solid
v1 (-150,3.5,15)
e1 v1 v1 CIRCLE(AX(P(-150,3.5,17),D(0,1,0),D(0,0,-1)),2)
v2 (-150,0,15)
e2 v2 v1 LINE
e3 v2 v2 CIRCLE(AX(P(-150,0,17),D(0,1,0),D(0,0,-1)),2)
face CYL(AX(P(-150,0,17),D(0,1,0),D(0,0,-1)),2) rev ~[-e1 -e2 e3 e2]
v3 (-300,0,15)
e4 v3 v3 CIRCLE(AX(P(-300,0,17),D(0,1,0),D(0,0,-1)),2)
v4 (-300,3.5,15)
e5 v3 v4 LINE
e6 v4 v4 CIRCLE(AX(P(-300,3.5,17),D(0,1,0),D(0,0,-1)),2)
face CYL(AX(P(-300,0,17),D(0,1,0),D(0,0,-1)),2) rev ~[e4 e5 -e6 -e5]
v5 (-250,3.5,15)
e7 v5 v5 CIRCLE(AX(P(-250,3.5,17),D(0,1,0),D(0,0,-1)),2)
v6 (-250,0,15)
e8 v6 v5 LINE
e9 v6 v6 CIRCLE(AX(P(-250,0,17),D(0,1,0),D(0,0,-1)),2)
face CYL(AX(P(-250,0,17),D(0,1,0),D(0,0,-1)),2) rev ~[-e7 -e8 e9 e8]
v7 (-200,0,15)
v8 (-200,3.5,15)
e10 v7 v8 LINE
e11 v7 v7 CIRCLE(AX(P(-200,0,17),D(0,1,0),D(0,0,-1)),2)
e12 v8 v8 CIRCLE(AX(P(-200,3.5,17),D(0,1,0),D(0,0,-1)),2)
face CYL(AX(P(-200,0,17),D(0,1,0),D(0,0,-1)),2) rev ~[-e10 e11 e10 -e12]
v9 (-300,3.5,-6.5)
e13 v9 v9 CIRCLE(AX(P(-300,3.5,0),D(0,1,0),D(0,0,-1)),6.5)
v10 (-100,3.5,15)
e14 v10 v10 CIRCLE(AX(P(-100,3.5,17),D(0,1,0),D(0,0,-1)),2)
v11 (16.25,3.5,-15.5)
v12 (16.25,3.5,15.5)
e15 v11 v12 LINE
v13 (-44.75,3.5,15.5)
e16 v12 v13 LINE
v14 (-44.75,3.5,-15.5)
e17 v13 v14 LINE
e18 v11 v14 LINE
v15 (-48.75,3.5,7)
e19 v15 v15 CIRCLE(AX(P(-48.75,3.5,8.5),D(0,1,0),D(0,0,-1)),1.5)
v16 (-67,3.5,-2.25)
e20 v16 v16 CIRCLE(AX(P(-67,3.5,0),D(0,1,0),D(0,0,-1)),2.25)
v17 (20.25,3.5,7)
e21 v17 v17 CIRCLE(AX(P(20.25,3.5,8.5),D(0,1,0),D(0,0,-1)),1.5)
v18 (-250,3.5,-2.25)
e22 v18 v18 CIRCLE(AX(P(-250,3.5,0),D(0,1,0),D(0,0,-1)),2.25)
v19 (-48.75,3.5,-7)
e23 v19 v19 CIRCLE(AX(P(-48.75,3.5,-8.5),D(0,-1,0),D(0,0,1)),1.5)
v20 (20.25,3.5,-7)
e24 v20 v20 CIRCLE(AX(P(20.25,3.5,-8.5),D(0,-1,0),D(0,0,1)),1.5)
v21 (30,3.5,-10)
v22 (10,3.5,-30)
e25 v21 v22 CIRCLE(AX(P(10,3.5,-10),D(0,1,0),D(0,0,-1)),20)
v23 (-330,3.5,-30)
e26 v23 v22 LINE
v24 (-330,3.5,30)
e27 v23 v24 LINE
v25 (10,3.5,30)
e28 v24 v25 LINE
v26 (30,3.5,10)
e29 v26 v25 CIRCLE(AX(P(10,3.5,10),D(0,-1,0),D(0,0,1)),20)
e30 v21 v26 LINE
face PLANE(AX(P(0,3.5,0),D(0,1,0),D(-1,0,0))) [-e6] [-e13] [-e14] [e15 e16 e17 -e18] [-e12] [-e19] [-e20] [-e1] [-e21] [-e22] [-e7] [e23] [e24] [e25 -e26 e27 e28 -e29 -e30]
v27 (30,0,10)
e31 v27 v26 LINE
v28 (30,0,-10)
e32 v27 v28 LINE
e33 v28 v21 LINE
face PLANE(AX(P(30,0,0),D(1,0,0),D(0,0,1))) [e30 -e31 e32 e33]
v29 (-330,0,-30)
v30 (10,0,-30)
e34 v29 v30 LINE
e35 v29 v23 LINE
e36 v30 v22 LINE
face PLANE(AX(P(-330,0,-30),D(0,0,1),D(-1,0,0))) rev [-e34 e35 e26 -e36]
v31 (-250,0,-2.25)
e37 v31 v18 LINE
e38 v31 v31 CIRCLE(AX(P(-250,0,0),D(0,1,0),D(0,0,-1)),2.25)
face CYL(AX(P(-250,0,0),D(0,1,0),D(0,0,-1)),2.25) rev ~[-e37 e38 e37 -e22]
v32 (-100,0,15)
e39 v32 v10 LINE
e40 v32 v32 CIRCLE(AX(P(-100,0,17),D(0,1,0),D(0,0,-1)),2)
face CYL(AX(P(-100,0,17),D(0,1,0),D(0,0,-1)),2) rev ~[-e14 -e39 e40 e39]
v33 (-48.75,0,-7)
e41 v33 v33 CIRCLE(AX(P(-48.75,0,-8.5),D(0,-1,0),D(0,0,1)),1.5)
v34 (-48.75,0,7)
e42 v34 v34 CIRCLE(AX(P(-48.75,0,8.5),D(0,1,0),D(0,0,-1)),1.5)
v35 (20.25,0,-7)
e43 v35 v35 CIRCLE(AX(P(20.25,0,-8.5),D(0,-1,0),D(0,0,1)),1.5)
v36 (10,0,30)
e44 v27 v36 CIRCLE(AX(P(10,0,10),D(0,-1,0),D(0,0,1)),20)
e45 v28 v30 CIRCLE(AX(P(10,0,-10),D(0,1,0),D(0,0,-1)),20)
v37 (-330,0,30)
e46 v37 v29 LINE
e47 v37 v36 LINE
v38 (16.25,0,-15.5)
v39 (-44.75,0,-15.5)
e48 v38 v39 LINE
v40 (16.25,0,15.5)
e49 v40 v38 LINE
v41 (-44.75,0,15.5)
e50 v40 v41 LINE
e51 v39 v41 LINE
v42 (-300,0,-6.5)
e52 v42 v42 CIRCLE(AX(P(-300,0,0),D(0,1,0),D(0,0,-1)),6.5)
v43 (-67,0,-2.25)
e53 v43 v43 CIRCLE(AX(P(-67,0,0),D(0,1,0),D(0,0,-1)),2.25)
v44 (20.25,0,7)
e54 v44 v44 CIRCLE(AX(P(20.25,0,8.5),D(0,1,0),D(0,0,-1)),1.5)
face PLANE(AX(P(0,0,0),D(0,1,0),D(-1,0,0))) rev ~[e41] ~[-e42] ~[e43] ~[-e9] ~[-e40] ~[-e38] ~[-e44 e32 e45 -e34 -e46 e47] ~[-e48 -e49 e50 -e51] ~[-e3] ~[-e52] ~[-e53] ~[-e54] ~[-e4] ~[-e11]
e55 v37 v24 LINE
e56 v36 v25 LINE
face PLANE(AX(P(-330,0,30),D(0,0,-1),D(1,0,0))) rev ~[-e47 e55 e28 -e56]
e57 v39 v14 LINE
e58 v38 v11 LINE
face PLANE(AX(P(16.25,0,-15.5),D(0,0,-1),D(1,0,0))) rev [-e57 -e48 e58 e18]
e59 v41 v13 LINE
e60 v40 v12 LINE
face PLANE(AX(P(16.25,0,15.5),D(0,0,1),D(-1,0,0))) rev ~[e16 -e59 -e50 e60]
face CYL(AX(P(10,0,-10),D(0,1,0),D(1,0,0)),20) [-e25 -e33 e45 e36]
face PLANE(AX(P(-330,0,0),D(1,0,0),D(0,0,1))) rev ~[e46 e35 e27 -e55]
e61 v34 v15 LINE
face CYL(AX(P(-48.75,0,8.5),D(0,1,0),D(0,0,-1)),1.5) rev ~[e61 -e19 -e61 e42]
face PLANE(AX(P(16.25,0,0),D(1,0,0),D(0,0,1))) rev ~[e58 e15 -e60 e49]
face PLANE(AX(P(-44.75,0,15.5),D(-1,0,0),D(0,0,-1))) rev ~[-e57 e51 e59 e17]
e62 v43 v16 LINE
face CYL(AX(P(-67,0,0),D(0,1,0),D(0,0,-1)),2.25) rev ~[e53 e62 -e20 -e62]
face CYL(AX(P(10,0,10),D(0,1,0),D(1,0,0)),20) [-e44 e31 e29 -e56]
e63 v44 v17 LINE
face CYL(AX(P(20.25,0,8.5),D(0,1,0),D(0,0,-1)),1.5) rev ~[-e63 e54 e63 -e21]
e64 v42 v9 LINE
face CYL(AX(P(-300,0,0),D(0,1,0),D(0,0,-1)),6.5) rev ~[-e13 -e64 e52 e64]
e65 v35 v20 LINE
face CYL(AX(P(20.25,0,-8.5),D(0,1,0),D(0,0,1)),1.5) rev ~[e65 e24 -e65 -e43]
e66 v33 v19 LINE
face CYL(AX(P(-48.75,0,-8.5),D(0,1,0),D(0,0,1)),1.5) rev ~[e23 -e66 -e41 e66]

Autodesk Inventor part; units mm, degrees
ref_plane "YZ Plane" through (0, 0, 0) normal (1, 0, 0) x (0, 1, 0)
ref_plane "XZ Plane" through (0, 0, 0) normal (0, 1, 0) x (-1, 0, 0)
ref_plane "XY Plane" through (0, 0, 0) normal (0, 0, 1) x (1, 0, 0)
sketch "Sketch1" plane through (0, 0, 0) normal (0, 1, 0) x (-1, 0, 0)
  line L0 (0, 0) -> (-16.25, 0)
  line L1 (0, 0) -> (44.75, 0)
  line L2 (300, 0) -> (330, 0)
  line L3 (330, 30) -> (-30, 30)
  line L4 (-16.25, 15.5) -> (44.75, 15.5)
  line L5 (44.75, 15.5) -> (44.75, 0)
  line L6 (44.75, -15.5) -> (-16.25, -15.5)
  line L7 (-16.25, -15.5) -> (-16.25, 0)
  line L8 (-16.25, 15.5) -> (44.75, -15.5) construction
  line L9 (44.75, 15.5) -> (-16.25, -15.5) construction
  line L10 (-20.25, 8.5) -> (48.75, 8.5) construction
  line L11 (48.75, 8.5) -> (48.75, -8.5) construction
  line L12 (48.75, -8.5) -> (-20.25, -8.5) construction
  line L13 (-20.25, -8.5) -> (-20.25, 8.5) construction
  line L14 (-20.25, 8.5) -> (48.75, -8.5) construction
  line L15 (48.75, 8.5) -> (-20.25, -8.5) construction
  line L16 (-30, 0) -> (-30, 30)
  line L17 (330, 0) -> (330, 30)
  line L18 (44.75, 0) -> (300, 0)
  line L19 (44.75, 0) -> (44.75, -15.5)
  line L20 (-16.25, 0) -> (-30, 0)
  line L21 (-16.25, 0) -> (-16.25, 15.5)
  line L22 (300, 0) -> (300, 17) construction
  line L23 (0, 0) -> (-30, 0) construction
  point P0 (14.25, 0)
  point P1 (14.25, 0)
  point P2 (289, 0)
  point P3 (67, 0)
  point P4 (250, 0)
  dimension "d0" = 300
  dimension "d5" = 61
  dimension "d6" = 31
  dimension "d7" = 69
  dimension "d8" = 17
  dimension "d9" = 16.25
  dimension "d10" = 30
  dimension "d11" = 30
  dimension "d20" = 17
  dimension "d21" = 11
  dimension "d46" = 97
  dimension "d47" = 80
extrude "Extrusion1" add sketch "Sketch1" along normal blind 3.5 contours L20 L16 L3 L17 L2 L18 L5 L4 L21
hole "Hole1" at (20.25, 0, 8.5) at (-48.75, 0, 8.5) direction (0, 1, 0) diameter 3 end through all
hole "Hole2" [suppressed]
fillet "Fillet1" radius 20 1 edges at (30, 1.75, 30)
mirror "Mirror1" about plane through (-44.75, 0, 0) normal (0, 0, -1)
hole "Hole3" at (-300, 0, 0) direction (0, 1, 0) diameter 13 end through all
hole "Hole4" at (-300, 0, 17) direction (0, 1, 0) diameter 4 end through all
pattern_linear "Rectangular Pattern1" count 5 spacing 50 along (1, 0, 0) of "Hole4"
hole "Hole5" at (-67, 0, 0) at (-250, 0, 0) direction (0, 1, 0) diameter 4.5 end through all
properties part number "segment1a" material "Plywood, Finish"
